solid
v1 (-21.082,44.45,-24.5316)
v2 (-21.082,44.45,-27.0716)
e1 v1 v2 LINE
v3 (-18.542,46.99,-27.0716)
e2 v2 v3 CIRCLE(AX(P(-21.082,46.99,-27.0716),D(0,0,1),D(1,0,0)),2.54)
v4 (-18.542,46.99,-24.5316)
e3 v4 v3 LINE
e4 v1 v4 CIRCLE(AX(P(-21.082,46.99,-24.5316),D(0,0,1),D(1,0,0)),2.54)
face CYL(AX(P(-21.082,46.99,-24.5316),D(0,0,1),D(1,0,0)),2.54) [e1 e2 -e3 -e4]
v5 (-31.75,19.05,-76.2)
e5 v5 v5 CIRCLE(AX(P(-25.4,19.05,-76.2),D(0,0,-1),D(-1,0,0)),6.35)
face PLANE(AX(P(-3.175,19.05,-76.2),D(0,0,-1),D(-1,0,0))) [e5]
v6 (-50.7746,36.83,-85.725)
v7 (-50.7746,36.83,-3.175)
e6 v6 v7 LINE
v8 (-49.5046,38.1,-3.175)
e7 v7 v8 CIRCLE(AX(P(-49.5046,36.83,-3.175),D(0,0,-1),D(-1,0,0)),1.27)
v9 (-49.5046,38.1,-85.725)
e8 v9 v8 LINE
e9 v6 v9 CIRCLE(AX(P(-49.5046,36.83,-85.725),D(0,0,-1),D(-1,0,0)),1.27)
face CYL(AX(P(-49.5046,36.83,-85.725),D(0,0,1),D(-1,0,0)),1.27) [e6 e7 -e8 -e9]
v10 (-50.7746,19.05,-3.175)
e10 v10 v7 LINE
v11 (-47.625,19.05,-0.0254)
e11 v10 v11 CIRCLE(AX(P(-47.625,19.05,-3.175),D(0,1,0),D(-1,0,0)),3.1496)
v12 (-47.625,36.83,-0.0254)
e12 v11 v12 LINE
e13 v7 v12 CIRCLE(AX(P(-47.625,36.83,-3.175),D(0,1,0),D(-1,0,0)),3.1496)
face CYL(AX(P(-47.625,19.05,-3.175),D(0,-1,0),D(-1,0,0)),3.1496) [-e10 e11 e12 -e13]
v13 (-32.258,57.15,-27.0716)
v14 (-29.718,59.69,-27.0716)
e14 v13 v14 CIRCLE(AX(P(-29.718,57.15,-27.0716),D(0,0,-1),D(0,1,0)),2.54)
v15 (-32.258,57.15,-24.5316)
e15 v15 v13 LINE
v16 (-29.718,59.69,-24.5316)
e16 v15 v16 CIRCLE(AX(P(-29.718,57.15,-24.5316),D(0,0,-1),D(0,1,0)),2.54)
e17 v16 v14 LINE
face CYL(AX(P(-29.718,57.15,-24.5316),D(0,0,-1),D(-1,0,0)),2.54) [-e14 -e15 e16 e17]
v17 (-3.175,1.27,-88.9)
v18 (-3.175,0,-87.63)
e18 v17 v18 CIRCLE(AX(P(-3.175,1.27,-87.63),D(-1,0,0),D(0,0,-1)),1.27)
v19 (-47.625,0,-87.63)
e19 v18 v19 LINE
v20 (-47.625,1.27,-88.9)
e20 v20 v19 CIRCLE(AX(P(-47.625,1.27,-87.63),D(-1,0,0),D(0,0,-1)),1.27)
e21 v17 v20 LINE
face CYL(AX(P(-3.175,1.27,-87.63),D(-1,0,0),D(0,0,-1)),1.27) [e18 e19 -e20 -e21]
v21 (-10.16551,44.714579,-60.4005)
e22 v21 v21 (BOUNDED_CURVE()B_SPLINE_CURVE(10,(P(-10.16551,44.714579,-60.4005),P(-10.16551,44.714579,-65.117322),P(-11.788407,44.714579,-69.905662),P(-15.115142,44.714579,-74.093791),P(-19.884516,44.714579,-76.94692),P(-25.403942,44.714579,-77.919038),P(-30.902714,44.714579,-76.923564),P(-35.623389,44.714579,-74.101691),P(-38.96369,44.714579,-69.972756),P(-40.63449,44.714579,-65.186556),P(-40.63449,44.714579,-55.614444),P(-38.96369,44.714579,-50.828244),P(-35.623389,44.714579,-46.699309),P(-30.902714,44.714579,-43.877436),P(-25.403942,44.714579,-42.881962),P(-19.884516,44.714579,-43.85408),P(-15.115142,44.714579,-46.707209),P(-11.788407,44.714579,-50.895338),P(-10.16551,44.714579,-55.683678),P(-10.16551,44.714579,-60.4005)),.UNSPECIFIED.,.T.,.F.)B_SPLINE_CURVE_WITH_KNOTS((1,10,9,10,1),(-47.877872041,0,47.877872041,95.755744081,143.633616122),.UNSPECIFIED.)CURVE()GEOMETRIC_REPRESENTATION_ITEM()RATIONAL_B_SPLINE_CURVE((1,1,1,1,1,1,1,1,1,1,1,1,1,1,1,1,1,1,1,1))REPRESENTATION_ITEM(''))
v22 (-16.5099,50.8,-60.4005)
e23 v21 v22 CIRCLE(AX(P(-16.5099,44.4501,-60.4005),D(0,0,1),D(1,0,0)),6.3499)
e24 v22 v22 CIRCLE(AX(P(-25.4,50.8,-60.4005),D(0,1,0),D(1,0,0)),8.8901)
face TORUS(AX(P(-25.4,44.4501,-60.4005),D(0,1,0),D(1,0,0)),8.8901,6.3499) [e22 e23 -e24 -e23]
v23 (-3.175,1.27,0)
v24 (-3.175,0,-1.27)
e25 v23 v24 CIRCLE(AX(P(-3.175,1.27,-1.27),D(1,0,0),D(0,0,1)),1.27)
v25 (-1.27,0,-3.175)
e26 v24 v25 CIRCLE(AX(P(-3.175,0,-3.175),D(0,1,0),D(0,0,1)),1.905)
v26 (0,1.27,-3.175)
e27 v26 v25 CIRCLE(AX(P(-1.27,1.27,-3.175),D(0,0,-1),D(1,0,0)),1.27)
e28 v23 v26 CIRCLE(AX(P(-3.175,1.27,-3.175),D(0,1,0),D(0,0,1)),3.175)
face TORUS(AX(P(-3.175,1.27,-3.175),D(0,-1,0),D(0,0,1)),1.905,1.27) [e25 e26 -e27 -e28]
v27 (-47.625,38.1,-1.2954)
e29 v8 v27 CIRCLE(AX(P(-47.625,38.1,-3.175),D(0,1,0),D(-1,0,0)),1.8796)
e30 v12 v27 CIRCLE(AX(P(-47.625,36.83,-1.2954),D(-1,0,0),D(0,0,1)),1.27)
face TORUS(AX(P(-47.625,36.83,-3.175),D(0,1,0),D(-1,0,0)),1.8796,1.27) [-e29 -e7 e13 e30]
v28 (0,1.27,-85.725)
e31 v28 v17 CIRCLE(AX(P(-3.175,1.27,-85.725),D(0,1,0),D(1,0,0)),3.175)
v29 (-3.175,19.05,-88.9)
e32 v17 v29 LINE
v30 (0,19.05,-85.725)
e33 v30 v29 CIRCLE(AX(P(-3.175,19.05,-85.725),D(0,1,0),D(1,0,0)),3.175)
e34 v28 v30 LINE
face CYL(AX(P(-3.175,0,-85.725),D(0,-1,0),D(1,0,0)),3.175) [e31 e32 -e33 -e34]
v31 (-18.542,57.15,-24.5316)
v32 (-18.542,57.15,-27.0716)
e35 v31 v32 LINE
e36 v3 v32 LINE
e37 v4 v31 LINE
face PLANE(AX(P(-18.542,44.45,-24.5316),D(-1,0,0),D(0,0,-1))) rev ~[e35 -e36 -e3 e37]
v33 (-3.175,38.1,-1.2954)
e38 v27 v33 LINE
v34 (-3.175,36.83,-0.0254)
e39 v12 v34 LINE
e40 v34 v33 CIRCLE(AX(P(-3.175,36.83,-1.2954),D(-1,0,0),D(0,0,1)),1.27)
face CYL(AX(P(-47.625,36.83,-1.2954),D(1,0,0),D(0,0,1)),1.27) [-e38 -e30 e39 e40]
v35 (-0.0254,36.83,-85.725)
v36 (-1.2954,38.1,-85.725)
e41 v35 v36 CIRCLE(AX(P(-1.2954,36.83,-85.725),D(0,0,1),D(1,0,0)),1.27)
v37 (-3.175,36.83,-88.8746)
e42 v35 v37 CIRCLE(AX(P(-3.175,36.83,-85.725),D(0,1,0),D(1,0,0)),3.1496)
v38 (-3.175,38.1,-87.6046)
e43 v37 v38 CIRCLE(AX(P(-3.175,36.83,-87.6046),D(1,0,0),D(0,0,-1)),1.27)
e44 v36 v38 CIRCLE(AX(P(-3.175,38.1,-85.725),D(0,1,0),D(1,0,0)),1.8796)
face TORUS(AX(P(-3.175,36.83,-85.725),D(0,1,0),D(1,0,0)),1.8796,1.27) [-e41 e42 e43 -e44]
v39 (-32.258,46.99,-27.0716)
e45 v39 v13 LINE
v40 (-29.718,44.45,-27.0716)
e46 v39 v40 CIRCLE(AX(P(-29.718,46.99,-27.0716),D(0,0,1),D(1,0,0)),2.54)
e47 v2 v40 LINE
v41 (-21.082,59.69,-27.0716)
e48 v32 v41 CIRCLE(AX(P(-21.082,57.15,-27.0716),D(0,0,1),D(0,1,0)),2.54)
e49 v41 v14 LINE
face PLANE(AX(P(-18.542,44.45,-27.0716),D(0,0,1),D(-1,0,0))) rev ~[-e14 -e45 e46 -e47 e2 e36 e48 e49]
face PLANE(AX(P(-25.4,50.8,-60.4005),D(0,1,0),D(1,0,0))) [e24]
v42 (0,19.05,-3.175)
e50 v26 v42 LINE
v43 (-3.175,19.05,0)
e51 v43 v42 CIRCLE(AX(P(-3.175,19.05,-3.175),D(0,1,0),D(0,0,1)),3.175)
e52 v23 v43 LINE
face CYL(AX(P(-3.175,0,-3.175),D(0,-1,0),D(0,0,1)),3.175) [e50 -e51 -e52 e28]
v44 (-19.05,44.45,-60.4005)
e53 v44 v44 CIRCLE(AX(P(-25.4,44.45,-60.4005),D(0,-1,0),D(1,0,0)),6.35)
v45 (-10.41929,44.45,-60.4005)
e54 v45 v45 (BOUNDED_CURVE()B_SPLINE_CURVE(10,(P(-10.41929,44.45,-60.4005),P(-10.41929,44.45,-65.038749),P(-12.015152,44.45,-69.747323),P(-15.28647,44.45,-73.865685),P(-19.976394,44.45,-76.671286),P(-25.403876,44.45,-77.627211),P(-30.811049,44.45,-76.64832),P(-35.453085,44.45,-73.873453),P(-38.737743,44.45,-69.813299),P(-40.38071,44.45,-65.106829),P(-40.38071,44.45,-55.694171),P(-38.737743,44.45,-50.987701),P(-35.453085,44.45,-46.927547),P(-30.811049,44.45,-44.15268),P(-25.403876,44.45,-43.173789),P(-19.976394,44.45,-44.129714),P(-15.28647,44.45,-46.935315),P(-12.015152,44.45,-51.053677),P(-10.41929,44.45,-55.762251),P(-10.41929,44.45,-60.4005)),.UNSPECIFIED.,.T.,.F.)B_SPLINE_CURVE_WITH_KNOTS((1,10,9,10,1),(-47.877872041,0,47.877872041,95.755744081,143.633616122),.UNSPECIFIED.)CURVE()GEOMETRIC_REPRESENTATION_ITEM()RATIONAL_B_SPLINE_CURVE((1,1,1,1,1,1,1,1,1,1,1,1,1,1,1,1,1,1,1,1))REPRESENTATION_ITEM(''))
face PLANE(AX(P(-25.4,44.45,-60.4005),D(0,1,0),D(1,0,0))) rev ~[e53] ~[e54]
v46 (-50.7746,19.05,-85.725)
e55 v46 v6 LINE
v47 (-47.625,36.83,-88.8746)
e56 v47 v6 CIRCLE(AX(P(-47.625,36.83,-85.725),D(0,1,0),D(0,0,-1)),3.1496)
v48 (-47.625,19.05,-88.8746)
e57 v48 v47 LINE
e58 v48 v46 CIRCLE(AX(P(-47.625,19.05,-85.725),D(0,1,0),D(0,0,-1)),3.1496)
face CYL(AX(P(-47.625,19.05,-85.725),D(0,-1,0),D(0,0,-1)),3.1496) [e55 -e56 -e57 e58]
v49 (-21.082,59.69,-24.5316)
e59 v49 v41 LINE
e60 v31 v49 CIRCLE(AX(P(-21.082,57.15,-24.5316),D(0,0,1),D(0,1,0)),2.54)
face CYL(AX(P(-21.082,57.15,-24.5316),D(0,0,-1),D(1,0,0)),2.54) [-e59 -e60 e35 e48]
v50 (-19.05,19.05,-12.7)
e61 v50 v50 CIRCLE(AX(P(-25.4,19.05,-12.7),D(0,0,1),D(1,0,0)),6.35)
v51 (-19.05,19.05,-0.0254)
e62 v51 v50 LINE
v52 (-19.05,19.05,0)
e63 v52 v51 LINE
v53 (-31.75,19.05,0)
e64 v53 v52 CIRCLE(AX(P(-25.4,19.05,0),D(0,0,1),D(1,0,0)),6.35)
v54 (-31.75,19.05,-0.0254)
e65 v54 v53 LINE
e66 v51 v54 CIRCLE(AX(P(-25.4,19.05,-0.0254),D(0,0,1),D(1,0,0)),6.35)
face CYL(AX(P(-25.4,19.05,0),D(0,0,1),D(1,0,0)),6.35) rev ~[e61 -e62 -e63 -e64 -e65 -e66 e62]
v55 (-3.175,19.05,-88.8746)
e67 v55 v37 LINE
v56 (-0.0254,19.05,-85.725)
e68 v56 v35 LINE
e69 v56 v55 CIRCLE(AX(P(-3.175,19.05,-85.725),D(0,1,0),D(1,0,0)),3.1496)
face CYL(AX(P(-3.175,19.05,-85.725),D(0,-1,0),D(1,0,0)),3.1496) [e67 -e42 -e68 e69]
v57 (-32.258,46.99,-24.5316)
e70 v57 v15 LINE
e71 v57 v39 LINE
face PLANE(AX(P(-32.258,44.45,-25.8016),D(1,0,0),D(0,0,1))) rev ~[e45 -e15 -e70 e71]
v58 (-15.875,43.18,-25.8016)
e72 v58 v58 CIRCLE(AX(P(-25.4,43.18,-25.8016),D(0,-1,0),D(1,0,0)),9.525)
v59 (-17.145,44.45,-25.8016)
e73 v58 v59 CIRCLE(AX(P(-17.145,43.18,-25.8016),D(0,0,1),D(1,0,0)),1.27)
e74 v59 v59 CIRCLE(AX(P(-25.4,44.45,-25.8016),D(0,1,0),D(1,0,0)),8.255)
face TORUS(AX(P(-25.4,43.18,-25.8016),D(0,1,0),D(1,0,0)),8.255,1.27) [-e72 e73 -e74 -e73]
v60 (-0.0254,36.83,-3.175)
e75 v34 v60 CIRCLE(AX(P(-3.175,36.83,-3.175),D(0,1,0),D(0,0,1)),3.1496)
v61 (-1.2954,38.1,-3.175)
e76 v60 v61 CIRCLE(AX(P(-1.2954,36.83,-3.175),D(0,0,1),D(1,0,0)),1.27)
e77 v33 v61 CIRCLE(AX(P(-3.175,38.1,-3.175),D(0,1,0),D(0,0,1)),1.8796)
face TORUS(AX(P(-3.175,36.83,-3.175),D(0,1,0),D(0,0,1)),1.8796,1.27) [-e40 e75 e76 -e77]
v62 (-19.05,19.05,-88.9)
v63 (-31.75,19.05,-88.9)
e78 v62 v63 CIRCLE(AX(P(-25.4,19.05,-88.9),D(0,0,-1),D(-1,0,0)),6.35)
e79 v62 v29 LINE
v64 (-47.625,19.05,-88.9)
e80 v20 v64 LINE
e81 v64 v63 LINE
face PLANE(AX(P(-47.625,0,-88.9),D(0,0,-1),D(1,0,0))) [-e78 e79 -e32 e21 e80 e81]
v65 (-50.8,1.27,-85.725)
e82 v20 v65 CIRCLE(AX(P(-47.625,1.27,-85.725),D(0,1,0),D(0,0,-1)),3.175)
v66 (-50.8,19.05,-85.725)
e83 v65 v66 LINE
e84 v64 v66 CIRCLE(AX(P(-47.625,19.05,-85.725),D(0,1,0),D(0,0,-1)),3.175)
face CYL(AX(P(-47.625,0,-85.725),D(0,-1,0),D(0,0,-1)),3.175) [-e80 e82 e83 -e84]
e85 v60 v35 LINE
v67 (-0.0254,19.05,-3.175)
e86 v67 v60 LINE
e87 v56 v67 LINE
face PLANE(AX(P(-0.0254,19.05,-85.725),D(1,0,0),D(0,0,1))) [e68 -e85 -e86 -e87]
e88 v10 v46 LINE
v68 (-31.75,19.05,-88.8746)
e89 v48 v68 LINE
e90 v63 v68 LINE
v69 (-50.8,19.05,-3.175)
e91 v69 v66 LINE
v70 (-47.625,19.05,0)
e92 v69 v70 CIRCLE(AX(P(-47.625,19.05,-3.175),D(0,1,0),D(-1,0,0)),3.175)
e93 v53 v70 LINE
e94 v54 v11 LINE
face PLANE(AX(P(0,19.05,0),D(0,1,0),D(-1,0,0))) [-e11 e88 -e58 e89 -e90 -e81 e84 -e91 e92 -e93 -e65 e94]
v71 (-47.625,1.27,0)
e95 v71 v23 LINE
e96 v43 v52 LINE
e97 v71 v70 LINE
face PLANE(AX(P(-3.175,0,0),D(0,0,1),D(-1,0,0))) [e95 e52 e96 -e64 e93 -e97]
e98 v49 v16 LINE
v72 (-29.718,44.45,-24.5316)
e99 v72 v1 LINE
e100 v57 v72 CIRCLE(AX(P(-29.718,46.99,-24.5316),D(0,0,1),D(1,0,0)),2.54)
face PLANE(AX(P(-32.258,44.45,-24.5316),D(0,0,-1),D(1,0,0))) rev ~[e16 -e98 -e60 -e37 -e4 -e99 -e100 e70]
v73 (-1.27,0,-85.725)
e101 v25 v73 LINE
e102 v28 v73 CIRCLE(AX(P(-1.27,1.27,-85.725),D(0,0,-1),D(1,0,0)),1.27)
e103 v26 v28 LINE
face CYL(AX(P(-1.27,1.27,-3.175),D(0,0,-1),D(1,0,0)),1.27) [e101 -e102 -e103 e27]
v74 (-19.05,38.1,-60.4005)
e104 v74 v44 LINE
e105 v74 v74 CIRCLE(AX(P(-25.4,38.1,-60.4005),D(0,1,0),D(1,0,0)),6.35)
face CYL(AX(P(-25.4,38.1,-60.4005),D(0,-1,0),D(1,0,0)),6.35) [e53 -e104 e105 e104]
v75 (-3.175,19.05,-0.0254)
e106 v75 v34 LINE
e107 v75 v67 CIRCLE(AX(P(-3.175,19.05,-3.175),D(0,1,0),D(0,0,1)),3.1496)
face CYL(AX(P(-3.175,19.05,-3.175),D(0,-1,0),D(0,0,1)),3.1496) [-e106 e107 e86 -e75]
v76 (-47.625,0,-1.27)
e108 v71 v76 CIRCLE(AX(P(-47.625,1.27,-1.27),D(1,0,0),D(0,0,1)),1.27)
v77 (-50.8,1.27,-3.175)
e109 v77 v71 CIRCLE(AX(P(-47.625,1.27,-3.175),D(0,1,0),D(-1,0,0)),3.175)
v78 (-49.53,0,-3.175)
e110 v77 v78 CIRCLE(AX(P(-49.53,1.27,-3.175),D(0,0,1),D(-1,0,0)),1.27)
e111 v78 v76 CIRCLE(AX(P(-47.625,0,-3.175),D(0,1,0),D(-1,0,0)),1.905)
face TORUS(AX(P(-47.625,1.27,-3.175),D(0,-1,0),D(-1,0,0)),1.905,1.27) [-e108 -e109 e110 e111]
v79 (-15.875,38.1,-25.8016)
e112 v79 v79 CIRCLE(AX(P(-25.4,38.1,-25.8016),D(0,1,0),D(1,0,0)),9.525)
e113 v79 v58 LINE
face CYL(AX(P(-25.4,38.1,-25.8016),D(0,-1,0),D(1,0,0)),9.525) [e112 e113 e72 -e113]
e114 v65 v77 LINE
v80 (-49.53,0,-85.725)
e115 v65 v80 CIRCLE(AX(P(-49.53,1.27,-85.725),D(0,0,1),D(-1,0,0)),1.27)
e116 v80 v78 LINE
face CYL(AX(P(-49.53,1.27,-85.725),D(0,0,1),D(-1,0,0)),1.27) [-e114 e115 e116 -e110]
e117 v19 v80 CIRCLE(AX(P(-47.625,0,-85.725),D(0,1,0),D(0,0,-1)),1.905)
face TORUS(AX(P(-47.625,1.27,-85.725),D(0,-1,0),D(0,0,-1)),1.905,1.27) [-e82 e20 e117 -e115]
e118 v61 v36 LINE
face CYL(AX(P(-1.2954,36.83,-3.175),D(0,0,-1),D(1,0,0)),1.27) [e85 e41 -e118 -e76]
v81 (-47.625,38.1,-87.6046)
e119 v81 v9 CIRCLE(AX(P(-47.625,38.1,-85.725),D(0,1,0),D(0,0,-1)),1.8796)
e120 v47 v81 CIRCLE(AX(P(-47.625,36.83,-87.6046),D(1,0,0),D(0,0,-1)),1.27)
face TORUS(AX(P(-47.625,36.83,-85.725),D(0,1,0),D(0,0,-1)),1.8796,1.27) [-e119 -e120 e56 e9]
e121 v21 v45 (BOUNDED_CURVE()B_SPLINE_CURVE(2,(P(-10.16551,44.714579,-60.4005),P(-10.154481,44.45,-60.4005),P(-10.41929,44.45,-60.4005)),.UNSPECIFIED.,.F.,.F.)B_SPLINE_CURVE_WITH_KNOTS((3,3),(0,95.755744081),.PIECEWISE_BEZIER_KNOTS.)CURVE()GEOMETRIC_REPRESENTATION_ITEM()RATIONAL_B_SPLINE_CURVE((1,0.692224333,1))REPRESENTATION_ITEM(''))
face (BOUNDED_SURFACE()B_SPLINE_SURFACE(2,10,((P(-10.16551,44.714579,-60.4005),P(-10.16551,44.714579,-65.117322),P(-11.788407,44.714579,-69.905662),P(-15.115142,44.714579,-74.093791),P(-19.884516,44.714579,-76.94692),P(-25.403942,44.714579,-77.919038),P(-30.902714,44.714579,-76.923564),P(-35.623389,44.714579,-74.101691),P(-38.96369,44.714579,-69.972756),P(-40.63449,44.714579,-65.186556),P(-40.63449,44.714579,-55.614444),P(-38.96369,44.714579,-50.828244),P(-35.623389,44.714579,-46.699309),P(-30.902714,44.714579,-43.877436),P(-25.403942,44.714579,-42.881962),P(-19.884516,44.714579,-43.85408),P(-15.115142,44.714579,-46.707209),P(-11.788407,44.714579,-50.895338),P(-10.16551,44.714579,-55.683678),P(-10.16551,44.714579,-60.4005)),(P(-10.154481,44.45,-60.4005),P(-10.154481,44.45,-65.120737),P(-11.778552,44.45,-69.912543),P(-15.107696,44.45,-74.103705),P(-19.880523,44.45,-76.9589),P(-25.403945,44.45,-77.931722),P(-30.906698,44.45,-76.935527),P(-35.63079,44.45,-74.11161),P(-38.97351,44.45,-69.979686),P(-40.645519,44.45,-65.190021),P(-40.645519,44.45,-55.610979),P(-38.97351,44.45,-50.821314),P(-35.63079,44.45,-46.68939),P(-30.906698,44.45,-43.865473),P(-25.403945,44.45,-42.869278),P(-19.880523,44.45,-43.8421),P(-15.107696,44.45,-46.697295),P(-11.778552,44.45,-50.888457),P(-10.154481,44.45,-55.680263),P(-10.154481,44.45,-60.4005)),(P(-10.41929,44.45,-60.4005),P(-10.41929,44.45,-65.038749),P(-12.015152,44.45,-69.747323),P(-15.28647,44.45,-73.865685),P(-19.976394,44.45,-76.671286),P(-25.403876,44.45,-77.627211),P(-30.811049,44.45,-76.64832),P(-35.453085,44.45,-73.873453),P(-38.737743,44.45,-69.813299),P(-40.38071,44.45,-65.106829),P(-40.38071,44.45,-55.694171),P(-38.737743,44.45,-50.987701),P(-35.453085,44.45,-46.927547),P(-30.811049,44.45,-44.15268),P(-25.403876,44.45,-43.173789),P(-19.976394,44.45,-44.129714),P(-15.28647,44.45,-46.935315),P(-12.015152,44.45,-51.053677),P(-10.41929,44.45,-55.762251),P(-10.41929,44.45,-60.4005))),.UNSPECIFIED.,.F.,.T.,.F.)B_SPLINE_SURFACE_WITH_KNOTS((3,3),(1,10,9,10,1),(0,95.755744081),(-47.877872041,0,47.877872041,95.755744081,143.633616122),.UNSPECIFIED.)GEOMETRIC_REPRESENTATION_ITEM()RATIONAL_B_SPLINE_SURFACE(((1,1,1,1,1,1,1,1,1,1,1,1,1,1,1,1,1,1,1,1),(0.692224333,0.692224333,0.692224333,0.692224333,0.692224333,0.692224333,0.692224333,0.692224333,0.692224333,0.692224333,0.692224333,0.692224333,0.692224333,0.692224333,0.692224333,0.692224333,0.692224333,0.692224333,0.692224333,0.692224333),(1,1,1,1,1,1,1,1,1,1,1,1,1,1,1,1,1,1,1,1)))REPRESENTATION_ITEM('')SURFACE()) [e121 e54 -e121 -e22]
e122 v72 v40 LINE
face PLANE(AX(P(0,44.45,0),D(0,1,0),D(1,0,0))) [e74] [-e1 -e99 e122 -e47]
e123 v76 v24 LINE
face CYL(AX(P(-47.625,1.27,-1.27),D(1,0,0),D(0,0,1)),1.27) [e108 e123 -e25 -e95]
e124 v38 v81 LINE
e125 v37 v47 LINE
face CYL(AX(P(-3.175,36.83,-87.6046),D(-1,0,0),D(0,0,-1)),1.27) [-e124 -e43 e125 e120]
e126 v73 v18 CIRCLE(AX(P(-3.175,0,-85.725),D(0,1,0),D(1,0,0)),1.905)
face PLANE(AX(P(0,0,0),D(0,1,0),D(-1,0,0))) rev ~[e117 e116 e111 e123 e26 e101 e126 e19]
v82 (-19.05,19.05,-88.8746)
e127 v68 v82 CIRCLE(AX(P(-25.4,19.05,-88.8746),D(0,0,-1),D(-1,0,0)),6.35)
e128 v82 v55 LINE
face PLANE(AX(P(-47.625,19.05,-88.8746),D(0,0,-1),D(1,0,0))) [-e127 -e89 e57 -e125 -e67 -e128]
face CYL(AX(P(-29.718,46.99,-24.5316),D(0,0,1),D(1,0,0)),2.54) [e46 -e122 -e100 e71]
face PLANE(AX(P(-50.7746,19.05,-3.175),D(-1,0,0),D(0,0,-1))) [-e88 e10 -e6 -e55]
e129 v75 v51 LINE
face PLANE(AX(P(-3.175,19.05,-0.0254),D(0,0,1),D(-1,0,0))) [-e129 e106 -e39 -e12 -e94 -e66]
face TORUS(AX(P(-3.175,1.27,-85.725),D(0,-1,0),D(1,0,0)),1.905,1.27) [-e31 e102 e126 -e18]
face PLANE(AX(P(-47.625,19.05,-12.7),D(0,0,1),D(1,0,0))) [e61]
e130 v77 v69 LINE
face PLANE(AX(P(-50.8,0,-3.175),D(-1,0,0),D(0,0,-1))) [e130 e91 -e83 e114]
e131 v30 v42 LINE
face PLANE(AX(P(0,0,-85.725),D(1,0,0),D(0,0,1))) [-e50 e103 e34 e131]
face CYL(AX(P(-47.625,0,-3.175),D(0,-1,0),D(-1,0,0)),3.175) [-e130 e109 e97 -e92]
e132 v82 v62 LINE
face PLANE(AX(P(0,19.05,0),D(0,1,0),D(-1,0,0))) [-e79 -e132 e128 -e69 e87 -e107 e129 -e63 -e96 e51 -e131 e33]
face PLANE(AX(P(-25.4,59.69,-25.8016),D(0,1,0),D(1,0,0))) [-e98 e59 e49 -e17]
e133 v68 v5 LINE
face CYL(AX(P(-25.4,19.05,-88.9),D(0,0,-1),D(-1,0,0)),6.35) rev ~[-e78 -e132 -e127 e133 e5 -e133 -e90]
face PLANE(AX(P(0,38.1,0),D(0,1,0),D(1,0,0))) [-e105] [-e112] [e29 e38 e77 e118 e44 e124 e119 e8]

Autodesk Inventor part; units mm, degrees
ref_plane "YZ Plane" through (0, 0, 0) normal (1, 0, 0) x (0, 1, 0)
ref_plane "XZ Plane" through (0, 0, 0) normal (0, 1, 0) x (-1, 0, 0)
ref_plane "XY Plane" through (0, 0, 0) normal (0, 0, 1) x (1, 0, 0)
sketch "Sketch1" plane through (0, 0, 0) normal (0, 1, 0) x (-1, 0, 0)
  line L0 (3.175, 0) -> (47.625, 0)
  line L1 (50.8, -3.175) -> (50.8, -85.725)
  line L2 (47.625, -88.9) -> (3.175, -88.9)
  line L3 (0, -85.725) -> (0, -3.175)
  arc A0 (50.8, -3.175) -> (47.625, 0) centre (47.625, -3.175) ccw
  arc A1 (47.625, -88.9) -> (50.8, -85.725) centre (47.625, -85.725) ccw
  arc A2 (0, -85.725) -> (3.175, -88.9) centre (3.175, -85.725) ccw
  arc A3 (3.175, 0) -> (0, -3.175) centre (3.175, -3.175) ccw
  point P0 (0, 0)
  point P1 (50.8, -88.9)
  point P2 (50.8, 0)
  point P3 (0, -88.9)
  dimension "d0" = 50.8
  dimension "d1" = 88.9
  dimension "d2" = 3.175
extrude "Extrusion1" add sketch "Sketch1" along normal blind 19.05
sketch "Sketch2" plane through (0, 19.05, 0) normal (0, 1, 0) x (1, 0, 0)
  line L0 (-3.175, 88.9) -> (-47.625, 88.9) projected
  arc A0 (-47.625, 88.9) -> (-50.8, 85.725) centre (-47.625, 85.725) ccw projected
  line L1 (-50.8, 85.725) -> (-50.8, 3.175) projected
  arc A1 (-50.8, 3.175) -> (-47.625, 0) centre (-47.625, 3.175) ccw projected
  line L2 (-47.625, 0) -> (-3.175, 0) projected
  arc A2 (-3.175, 0) -> (0, 3.175) centre (-3.175, 3.175) ccw projected
  line L3 (0, 3.175) -> (0, 85.725) projected
  arc A3 (0, 85.725) -> (-3.175, 88.9) centre (-3.175, 85.725) ccw projected
  line L4 (-50.7746, 3.175) -> (-50.7746, 85.725)
  arc A4 (-47.625, 88.8746) -> (-50.7746, 85.725) centre (-47.625, 85.725) ccw
  line L5 (-47.625, 88.8746) -> (-3.175, 88.8746)
  arc A5 (-0.0254, 85.725) -> (-3.175, 88.8746) centre (-3.175, 85.725) ccw
  line L6 (-0.0254, 85.725) -> (-0.0254, 3.175)
  arc A6 (-3.175, 0.0254) -> (-0.0254, 3.175) centre (-3.175, 3.175) ccw
  line L7 (-3.175, 0.0254) -> (-47.625, 0.0254)
  arc A7 (-50.7746, 3.175) -> (-47.625, 0.0254) centre (-47.625, 3.175) ccw
  point P0 (0, 0)
  dimension "d6" = 0.0254
extrude "Extrusion2" add sketch "Sketch2" along normal blind 19.05 contours L4 A4 L5 A5 L6 A6 L7 A7
fillet "Fillet2" radius 1.27 16 edges at (-0.9479, 38.1, -0.9479) (-0.0254, 38.1, -44.45) (-0.9479, 38.1, -87.9521) (-25.4, 38.1, -88.8746) (-49.8521, 38.1, -87.9521) (-50.7746, 38.1, -44.45) (-49.8521, 38.1, -0.9479) (-25.4, 38.1, -0.0254) (-0.9299, 0, -0.9299) (0, 0, -44.45) (-0.9299, 0, -87.9701) (-25.4, 0, -88.9) (-49.8701, 0, -87.9701) (-50.8, 0, -44.45) (-49.8701, 0, -0.9299) (-25.4, 0, 0)
sketch "Sketch3" plane through (0, 38.1, 0) normal (0, 1, 0) x (1, 0, 0)
  line L0 (-3.175, 1.2954) -> (-47.625, 1.2954) projected
  line L1 (-25.4, 1.2954) -> (-25.4, 87.6046)
  line L2 (-47.625, 87.6046) -> (-3.175, 87.6046) projected
  circle A0 centre (-25.4, 60.4005) radius 6.35
  circle A1 centre (-25.4, 25.8016) radius 9.525
  point P0 (0, 0)
  dimension "d10" = 12.7
  dimension "d11" = 19.05
extrude "Extrusion3" add sketch "Sketch3" along normal blind 6.35
fillet "Fillet3" radius 1.27 1 edges at (-34.925, 44.45, -25.8016)
sketch "Sketch4" plane through (-25.4, 44.45, -60.4005) normal (0, 1, 0) x (1, 0, 0)
  circle A0 centre (0, 0) radius 15.24
  point P0 (25.4, -60.4005)
  dimension "d15" = 30.48
extrude "Extrusion4" add sketch "Sketch4" along normal blind 6.35
fillet "Fillet4" radius 6.35 1 edges at (-40.64, 50.8, -60.4005)
fillet "Fillet5" radius 0.254 2 edges at (-40.64, 44.4501, -60.4005) (-40.64, 44.45, -60.4005)
sketch "Sketch5" plane through (-25.4, 44.45, -25.8016) normal (0, 1, 0) x (1, 0, 0)
  circle A0 centre (0, 0) radius 8.255 projected
  line L0 (0, 0) -> (-6.858, 0)
  line L1 (-6.858, 0) -> (-6.858, -1.27)
  line L2 (-6.858, -1.27) -> (0, -1.27)
  line L3 (0, -1.27) -> (0, 0)
  line L4 (-6.858, -1.27) -> (6.858, -1.27)
  line L5 (6.858, -1.27) -> (6.858, 1.27)
  line L6 (6.858, 1.27) -> (-6.858, 1.27)
  line L7 (-6.858, 1.27) -> (-6.858, -1.27)
  point P0 (25.4, -25.8016)
  point P1 (0, -1.27)
  point P2 (-6.858, 0)
  dimension "d20" = 6.858
  dimension "d21" = 1.27
  dimension "d22" = 13.716
  dimension "d23" = 2.54
extrude "Extrusion5" add sketch "Sketch5" along normal blind 15.24 contours L3 L2 L1 L0 | L0 L7 L6 L5 L4 L3
fillet "Fillet6" radius 2.54 2 edges at (-18.542, 59.69, -25.8016) (-32.258, 59.69, -25.8016)
sketch "Sketch6" plane through (-32.258, 44.45, -24.5316) normal (0, 0, 1) x (1, 0, 0)
  arc A0 (2.54, 15.24) -> (0, 12.7) centre (2.54, 12.7) ccw projected
  line L0 (0, 0) -> (0, 12.7) projected
  line L1 (13.716, 0) -> (0, 0) projected
  line L2 (13.716, 0) -> (13.716, 12.7) projected
  arc A1 (13.716, 12.7) -> (11.176, 15.24) centre (11.176, 12.7) ccw projected
  line L3 (2.54, 15.24) -> (11.176, 15.24) projected
  line L4 (0, 0) -> (2.54, 0)
  line L5 (2.54, 0) -> (2.54, 2.54)
  line L6 (2.54, 2.54) -> (0, 2.54)
  line L7 (0, 2.54) -> (0, 0)
  line L8 (13.716, 0) -> (11.176, 0)
  line L9 (11.176, 0) -> (11.176, 2.54)
  line L10 (11.176, 2.54) -> (13.716, 2.54)
  line L11 (13.716, 2.54) -> (13.716, 0)
  circle A2 centre (2.54, 2.54) radius 2.54
  circle A3 centre (11.176, 2.54) radius 2.54
  point P0 (32.258, -44.45)
  point P1 (13.716, 2.54)
  point P2 (0, 2.54)
  dimension "d27" = 2.54
  dimension "d28" = 2.54
  dimension "d29" = 2.54
  dimension "d30" = 2.54
extrude "Extrusion6" cut sketch "Sketch6" against normal blind 15.24 contours A2 L1 L0 | L2 L1 A3
sketch "Sketch7" plane through (-47.625, 19.05, 0) normal (0, 0, 1) x (1, 0, 0)
  line L0 (44.45, 0) -> (0, 0) projected
  circle A0 centre (22.225, 0) radius 6.35
  point P0 (47.625, -19.05)
  dimension "d33" = 12.7
sketch "Sketch8" plane through (-3.175, 19.05, -88.9) normal (0, 0, -1) x (-1, 0, 0)
  line L0 (0, 0) -> (44.45, 0) projected
  circle A0 centre (22.225, 0) radius 6.35
  point P0 (-3.175, -19.05)
  dimension "d34" = 12.7
extrude "Extrusion7" cut sketch "Sketch8" along normal blind 25.4 and the other way blind 12.7
extrude "Extrusion8" cut sketch "Sketch7" along normal blind 25.4 and the other way blind 12.7
properties part number "Estop"
